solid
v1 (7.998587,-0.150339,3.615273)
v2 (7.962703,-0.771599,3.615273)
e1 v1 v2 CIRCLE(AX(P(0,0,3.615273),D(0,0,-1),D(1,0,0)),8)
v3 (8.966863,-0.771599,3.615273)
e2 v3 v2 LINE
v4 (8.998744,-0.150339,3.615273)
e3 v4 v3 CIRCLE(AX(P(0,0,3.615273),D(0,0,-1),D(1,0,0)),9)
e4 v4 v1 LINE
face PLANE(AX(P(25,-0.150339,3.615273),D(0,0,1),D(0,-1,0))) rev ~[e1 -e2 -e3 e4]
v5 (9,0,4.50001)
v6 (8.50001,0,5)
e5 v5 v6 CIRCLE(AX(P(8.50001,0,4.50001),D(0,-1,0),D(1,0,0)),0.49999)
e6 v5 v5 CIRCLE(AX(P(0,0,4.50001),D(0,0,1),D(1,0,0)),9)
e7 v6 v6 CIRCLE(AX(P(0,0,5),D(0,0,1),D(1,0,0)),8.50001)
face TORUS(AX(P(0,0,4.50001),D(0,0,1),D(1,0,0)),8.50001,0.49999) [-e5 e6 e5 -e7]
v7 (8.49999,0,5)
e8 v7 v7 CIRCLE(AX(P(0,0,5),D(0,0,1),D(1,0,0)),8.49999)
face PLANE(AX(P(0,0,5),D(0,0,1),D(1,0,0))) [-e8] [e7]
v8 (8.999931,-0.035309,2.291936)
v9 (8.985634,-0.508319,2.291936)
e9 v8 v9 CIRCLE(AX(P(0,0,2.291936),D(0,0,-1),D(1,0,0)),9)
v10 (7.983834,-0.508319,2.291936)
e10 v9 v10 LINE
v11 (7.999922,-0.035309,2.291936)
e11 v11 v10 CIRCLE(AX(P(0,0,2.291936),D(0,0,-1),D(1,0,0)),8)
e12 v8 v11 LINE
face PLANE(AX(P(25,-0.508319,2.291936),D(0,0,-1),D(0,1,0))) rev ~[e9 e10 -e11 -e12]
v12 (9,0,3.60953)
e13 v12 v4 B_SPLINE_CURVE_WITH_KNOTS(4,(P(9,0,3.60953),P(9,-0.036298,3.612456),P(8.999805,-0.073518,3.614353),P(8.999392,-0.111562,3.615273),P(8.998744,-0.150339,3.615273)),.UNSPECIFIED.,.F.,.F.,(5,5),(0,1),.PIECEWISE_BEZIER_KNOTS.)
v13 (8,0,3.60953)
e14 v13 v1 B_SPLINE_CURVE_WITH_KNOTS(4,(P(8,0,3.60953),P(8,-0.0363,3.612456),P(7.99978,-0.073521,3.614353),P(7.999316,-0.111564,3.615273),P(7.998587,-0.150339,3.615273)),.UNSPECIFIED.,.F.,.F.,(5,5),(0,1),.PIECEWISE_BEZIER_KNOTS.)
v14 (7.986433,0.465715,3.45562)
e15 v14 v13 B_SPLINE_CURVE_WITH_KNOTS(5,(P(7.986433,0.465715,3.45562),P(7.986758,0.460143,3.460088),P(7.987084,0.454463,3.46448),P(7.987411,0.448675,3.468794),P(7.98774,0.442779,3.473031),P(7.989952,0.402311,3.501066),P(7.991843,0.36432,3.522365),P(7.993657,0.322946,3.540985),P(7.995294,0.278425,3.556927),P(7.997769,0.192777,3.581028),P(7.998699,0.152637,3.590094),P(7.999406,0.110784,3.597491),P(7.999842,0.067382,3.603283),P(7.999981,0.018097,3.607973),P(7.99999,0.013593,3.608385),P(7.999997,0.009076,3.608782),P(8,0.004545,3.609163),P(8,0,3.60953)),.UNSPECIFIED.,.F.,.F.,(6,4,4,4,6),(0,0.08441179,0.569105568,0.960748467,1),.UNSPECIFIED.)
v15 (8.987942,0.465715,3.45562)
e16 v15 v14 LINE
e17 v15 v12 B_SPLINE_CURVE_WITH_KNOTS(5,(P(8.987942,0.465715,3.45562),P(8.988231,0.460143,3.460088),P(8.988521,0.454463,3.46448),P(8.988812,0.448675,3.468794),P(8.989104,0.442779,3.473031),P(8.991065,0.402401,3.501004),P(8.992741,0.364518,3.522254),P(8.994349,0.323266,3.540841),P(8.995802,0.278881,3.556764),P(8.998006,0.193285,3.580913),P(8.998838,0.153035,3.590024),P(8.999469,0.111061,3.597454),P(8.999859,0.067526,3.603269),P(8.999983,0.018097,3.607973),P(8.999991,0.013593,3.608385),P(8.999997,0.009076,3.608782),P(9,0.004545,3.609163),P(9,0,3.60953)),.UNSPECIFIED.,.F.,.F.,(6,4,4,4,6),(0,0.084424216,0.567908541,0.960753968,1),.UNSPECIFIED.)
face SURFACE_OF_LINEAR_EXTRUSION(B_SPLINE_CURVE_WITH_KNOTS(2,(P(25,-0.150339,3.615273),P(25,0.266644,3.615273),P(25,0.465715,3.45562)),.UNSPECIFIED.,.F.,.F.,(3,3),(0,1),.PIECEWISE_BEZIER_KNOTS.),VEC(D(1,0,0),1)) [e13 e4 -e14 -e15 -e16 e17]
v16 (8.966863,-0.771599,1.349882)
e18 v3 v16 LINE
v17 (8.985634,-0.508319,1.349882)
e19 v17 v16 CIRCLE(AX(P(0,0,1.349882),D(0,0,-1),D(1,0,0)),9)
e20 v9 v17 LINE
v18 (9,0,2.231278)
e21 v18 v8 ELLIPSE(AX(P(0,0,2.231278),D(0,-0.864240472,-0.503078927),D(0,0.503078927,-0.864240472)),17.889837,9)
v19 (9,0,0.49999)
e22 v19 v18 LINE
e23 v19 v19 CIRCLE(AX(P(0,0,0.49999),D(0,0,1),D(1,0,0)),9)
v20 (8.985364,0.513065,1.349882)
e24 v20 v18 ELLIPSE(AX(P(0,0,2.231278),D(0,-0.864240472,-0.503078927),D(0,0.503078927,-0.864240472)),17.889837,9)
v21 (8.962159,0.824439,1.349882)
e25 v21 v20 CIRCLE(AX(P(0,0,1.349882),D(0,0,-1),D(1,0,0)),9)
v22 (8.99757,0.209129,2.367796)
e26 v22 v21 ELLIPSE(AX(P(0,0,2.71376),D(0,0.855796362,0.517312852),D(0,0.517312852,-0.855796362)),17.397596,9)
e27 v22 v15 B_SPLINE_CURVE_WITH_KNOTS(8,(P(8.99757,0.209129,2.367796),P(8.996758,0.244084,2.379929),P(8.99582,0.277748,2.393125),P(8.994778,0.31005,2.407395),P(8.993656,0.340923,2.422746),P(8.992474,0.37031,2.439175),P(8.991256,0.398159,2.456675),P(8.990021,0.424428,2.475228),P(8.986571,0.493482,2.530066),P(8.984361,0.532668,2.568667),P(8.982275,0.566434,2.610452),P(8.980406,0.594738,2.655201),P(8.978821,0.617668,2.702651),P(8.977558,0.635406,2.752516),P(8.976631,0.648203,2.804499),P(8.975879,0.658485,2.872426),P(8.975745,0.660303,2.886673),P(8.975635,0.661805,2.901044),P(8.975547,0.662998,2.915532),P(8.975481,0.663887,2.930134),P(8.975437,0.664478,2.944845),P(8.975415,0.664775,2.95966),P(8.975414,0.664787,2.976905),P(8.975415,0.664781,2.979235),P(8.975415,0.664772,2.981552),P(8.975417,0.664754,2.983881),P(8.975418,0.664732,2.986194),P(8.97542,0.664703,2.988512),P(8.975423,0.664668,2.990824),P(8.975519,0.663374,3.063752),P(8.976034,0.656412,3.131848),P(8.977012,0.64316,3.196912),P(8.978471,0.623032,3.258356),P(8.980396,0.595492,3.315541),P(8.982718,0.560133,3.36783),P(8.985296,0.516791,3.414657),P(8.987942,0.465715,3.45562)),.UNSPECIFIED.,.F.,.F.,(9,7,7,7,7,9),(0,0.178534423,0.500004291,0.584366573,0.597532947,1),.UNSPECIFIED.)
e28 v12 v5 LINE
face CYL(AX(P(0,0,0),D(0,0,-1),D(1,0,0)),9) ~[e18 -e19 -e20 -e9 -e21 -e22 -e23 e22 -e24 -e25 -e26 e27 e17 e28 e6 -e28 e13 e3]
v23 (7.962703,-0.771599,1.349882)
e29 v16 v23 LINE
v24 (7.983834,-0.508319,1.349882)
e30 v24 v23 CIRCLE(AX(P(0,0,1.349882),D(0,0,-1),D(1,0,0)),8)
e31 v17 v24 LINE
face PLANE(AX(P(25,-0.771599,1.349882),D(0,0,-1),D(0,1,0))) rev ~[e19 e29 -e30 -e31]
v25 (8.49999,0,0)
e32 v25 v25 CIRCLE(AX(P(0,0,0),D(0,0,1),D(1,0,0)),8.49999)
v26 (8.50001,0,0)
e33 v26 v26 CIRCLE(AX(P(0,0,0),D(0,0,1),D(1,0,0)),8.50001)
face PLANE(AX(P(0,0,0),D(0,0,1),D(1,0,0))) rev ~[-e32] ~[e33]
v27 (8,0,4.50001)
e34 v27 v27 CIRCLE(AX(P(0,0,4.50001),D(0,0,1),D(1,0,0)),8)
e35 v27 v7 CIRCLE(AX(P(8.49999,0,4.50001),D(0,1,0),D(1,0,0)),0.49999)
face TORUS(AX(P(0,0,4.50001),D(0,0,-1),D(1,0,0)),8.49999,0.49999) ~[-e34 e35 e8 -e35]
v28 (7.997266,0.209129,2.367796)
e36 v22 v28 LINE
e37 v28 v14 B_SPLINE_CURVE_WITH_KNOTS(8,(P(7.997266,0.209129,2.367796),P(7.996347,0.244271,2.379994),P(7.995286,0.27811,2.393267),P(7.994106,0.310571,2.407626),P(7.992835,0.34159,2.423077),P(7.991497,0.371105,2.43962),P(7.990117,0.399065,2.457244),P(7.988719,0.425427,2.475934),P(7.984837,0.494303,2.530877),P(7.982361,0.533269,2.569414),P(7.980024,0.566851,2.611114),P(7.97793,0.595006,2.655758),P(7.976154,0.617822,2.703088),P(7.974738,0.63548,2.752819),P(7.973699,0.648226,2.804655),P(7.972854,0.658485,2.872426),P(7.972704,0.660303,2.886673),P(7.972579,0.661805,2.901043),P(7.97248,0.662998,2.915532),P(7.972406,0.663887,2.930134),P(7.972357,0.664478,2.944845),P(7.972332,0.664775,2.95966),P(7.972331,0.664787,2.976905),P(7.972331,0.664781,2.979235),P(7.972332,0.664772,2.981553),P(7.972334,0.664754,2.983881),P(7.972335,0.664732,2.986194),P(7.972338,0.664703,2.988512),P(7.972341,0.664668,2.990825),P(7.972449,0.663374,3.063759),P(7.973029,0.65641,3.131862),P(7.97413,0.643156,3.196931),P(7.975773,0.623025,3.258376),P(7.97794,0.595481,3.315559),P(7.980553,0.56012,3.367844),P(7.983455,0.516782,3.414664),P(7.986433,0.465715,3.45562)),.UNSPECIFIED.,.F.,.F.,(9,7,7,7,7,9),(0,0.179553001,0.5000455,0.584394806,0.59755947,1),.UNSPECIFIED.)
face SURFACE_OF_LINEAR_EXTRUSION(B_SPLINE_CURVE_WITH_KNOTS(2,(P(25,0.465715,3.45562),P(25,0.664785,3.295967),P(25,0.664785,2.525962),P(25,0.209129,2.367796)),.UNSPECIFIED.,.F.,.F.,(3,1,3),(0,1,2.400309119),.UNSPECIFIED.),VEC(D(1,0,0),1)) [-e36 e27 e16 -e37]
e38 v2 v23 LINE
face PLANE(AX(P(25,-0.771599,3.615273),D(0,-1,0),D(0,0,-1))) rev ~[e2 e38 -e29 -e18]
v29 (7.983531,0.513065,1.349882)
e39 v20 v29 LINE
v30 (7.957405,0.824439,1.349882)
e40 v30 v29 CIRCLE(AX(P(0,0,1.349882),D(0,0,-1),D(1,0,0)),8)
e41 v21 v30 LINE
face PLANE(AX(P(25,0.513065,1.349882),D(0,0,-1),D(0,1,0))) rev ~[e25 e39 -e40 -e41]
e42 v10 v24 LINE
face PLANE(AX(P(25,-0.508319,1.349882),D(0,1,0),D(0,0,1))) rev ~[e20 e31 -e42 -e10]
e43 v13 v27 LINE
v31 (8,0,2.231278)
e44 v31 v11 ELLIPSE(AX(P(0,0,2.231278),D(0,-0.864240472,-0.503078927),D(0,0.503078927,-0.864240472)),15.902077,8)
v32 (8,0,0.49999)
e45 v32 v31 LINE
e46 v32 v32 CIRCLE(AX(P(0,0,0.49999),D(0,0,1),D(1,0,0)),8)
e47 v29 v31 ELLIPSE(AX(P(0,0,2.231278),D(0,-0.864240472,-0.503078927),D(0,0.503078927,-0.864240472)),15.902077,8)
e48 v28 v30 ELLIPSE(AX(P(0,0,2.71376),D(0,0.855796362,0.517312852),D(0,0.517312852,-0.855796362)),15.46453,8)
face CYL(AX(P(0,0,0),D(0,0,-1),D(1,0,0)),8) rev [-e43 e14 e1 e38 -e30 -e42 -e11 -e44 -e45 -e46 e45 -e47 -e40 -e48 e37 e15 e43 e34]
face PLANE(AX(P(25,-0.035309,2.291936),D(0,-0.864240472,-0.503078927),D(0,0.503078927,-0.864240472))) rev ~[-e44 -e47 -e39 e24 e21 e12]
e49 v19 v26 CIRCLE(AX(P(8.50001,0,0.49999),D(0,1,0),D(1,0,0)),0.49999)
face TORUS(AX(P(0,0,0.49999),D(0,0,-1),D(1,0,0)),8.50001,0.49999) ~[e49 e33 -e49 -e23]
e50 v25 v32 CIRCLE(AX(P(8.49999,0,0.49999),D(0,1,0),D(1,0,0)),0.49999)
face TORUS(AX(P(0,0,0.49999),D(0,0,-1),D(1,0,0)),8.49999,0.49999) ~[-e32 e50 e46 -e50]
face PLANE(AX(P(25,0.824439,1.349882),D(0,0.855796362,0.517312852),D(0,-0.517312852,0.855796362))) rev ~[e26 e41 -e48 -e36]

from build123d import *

# Parameters (mm, degrees)
F0_R     = 9
F0_R_2   = 8
F1_DEPTH = 5
F2_R     = 0.49999
F3_R     = 0.49999
F6_DEPTH = 25


# Not quite as in the source:
# - a fillet or chamfer is up to 0.001 mm smaller than in the source, because OpenCascade refuses the exact size


with BuildPart() as f1:
    # F0 (on Top) → F1 (new body)
    with BuildSketch(Plane.XY):
        Circle(F0_R)
        Circle(F0_R_2, mode=Mode.SUBTRACT)
    extrude(amount=F1_DEPTH)

    # F2 (radius 0.5 in the source; OpenCascade refuses exactly that, so slightly less here)
    f2_edges = [f1.edges().sort_by_distance(p)[0] for p in [
        (-8, 0, 5),
        (-9, 0, 5),
    ]]
    fillet(f2_edges, radius=F2_R)

    # F3 (radius 0.5 in the source; OpenCascade refuses exactly that, so slightly less here)
    f3_edges = [f1.edges().sort_by_distance(p)[0] for p in [
        (-8, 0, 0),
        (-9, 0, 0),
    ]]
    fillet(f3_edges, radius=F3_R)

    # F5 (on offset) → F6 (cut)
    with BuildSketch(Plane.YZ.offset(25)):
        with BuildLine():
            Line((-0.5083193487, 1.3498821063), (-0.5083193487, 2.2919357963))
            Line((-0.5083193487, 2.2919357963), (-0.0353092327, 2.2919357963))
            Line((-0.0353092327, 2.2919357963), (0.5130651784, 1.3498821063))
            Line((0.5130651784, 1.3498821063), (0.8244387138, 1.3498821063))
            Line((0.8244387138, 1.3498821063), (0.2091289089, 2.3677959092))
            add(Edge.make_bspline(
                [(0.6647854042, 2.9751726304), (0.6647854042, 2.5259617656), (0.2091289089, 2.3677959092)],
                knots=[0, 0, 0, 1, 1, 1], degree=2))
            add(Edge.make_bspline(
                [(0.465714585, 3.4556200122), (0.6647854042, 3.2959667027), (0.6647854042, 2.9751726304)],
                knots=[0, 0, 0, 1, 1, 1], degree=2))
            add(Edge.make_bspline(
                [(-0.1503389465, 3.6152733218), (0.2666437658, 3.6152733218), (0.465714585, 3.4556200122)],
                knots=[0, 0, 0, 1, 1, 1], degree=2))
            Line((-0.1503389465, 3.6152733218), (-0.7715985641, 3.6152733218))
            Line((-0.7715985641, 3.6152733218), (-0.7715985641, 1.3498821063))
            Line((-0.7715985641, 1.3498821063), (-0.5083193487, 1.3498821063))
        make_face()
        Polygon((-0.5905224825, 2.4278266355), (-0.5905224825, 3.4481487237), (0, 3.4917523153), (0.4821238399, 3.2650141511), (0.4821238399, 2.7940962464), (0.1768992952, 2.4278266355), align=None, mode=Mode.SUBTRACT)
        Polygon((0, 3.4917523153), (-0.5905224825, 3.4481487237), (-0.5905224825, 2.4278266355), (0.1768992952, 2.4278266355), (0.4821238399, 2.7940962464), (0.4821238399, 3.2650141511), align=None)
        with BuildLine():
            Line((-0.1468682223, 2.5180286819), (-0.5083193487, 2.5180286819))
            Line((-0.5083193487, 2.5180286819), (-0.5083193487, 3.3842222589))
            Line((-0.5083193487, 3.3842222589), (-0.1657092961, 3.3842222589))
            add(Edge.make_bspline(
                [(0.2597023175, 3.2850587126), (0.1273189832, 3.3842222589), (-0.1657092961, 3.3842222589)],
                knots=[0, 0, 0, 1, 1, 1], degree=2))
            add(Edge.make_bspline(
                [(0.3920856519, 2.9612897339), (0.3920856519, 3.1858951663), (0.2597023175, 3.2850587126)],
                knots=[0, 0, 0, 1, 1, 1], degree=2))
            add(Edge.make_bspline(
                [(0.2619334973, 2.6288439449), (0.3920856519, 2.7396592079), (0.3920856519, 2.9612897339)],
                knots=[0, 0, 0, 1, 1, 1], degree=2))
            add(Edge.make_bspline(
                [(-0.1468682223, 2.5180286819), (0.1317813428, 2.5180286819), (0.2619334973, 2.6288439449)],
                knots=[0, 0, 0, 1, 1, 1], degree=2))
        make_face(mode=Mode.SUBTRACT)
        with BuildLine():
            Line((-0.5083193487, 3.3842222589), (-0.5083193487, 2.5180286819))
            Line((-0.5083193487, 2.5180286819), (-0.1468682223, 2.5180286819))
            add(Edge.make_bspline(
                [(-0.1468682223, 2.5180286819), (0.1317813428, 2.5180286819), (0.2619334973, 2.6288439449)],
                knots=[0, 0, 0, 1, 1, 1], degree=2))
            add(Edge.make_bspline(
                [(0.2619334973, 2.6288439449), (0.3920856519, 2.7396592079), (0.3920856519, 2.9612897339)],
                knots=[0, 0, 0, 1, 1, 1], degree=2))
            add(Edge.make_bspline(
                [(0.3920856519, 2.9612897339), (0.3920856519, 3.1858951663), (0.2597023175, 3.2850587126)],
                knots=[0, 0, 0, 1, 1, 1], degree=2))
            add(Edge.make_bspline(
                [(0.2597023175, 3.2850587126), (0.1273189832, 3.3842222589), (-0.1657092961, 3.3842222589)],
                knots=[0, 0, 0, 1, 1, 1], degree=2))
            Line((-0.1657092961, 3.3842222589), (-0.5083193487, 3.3842222589))
        make_face()
    extrude(amount=-F6_DEPTH, mode=Mode.SUBTRACT)


solid = f1.part
